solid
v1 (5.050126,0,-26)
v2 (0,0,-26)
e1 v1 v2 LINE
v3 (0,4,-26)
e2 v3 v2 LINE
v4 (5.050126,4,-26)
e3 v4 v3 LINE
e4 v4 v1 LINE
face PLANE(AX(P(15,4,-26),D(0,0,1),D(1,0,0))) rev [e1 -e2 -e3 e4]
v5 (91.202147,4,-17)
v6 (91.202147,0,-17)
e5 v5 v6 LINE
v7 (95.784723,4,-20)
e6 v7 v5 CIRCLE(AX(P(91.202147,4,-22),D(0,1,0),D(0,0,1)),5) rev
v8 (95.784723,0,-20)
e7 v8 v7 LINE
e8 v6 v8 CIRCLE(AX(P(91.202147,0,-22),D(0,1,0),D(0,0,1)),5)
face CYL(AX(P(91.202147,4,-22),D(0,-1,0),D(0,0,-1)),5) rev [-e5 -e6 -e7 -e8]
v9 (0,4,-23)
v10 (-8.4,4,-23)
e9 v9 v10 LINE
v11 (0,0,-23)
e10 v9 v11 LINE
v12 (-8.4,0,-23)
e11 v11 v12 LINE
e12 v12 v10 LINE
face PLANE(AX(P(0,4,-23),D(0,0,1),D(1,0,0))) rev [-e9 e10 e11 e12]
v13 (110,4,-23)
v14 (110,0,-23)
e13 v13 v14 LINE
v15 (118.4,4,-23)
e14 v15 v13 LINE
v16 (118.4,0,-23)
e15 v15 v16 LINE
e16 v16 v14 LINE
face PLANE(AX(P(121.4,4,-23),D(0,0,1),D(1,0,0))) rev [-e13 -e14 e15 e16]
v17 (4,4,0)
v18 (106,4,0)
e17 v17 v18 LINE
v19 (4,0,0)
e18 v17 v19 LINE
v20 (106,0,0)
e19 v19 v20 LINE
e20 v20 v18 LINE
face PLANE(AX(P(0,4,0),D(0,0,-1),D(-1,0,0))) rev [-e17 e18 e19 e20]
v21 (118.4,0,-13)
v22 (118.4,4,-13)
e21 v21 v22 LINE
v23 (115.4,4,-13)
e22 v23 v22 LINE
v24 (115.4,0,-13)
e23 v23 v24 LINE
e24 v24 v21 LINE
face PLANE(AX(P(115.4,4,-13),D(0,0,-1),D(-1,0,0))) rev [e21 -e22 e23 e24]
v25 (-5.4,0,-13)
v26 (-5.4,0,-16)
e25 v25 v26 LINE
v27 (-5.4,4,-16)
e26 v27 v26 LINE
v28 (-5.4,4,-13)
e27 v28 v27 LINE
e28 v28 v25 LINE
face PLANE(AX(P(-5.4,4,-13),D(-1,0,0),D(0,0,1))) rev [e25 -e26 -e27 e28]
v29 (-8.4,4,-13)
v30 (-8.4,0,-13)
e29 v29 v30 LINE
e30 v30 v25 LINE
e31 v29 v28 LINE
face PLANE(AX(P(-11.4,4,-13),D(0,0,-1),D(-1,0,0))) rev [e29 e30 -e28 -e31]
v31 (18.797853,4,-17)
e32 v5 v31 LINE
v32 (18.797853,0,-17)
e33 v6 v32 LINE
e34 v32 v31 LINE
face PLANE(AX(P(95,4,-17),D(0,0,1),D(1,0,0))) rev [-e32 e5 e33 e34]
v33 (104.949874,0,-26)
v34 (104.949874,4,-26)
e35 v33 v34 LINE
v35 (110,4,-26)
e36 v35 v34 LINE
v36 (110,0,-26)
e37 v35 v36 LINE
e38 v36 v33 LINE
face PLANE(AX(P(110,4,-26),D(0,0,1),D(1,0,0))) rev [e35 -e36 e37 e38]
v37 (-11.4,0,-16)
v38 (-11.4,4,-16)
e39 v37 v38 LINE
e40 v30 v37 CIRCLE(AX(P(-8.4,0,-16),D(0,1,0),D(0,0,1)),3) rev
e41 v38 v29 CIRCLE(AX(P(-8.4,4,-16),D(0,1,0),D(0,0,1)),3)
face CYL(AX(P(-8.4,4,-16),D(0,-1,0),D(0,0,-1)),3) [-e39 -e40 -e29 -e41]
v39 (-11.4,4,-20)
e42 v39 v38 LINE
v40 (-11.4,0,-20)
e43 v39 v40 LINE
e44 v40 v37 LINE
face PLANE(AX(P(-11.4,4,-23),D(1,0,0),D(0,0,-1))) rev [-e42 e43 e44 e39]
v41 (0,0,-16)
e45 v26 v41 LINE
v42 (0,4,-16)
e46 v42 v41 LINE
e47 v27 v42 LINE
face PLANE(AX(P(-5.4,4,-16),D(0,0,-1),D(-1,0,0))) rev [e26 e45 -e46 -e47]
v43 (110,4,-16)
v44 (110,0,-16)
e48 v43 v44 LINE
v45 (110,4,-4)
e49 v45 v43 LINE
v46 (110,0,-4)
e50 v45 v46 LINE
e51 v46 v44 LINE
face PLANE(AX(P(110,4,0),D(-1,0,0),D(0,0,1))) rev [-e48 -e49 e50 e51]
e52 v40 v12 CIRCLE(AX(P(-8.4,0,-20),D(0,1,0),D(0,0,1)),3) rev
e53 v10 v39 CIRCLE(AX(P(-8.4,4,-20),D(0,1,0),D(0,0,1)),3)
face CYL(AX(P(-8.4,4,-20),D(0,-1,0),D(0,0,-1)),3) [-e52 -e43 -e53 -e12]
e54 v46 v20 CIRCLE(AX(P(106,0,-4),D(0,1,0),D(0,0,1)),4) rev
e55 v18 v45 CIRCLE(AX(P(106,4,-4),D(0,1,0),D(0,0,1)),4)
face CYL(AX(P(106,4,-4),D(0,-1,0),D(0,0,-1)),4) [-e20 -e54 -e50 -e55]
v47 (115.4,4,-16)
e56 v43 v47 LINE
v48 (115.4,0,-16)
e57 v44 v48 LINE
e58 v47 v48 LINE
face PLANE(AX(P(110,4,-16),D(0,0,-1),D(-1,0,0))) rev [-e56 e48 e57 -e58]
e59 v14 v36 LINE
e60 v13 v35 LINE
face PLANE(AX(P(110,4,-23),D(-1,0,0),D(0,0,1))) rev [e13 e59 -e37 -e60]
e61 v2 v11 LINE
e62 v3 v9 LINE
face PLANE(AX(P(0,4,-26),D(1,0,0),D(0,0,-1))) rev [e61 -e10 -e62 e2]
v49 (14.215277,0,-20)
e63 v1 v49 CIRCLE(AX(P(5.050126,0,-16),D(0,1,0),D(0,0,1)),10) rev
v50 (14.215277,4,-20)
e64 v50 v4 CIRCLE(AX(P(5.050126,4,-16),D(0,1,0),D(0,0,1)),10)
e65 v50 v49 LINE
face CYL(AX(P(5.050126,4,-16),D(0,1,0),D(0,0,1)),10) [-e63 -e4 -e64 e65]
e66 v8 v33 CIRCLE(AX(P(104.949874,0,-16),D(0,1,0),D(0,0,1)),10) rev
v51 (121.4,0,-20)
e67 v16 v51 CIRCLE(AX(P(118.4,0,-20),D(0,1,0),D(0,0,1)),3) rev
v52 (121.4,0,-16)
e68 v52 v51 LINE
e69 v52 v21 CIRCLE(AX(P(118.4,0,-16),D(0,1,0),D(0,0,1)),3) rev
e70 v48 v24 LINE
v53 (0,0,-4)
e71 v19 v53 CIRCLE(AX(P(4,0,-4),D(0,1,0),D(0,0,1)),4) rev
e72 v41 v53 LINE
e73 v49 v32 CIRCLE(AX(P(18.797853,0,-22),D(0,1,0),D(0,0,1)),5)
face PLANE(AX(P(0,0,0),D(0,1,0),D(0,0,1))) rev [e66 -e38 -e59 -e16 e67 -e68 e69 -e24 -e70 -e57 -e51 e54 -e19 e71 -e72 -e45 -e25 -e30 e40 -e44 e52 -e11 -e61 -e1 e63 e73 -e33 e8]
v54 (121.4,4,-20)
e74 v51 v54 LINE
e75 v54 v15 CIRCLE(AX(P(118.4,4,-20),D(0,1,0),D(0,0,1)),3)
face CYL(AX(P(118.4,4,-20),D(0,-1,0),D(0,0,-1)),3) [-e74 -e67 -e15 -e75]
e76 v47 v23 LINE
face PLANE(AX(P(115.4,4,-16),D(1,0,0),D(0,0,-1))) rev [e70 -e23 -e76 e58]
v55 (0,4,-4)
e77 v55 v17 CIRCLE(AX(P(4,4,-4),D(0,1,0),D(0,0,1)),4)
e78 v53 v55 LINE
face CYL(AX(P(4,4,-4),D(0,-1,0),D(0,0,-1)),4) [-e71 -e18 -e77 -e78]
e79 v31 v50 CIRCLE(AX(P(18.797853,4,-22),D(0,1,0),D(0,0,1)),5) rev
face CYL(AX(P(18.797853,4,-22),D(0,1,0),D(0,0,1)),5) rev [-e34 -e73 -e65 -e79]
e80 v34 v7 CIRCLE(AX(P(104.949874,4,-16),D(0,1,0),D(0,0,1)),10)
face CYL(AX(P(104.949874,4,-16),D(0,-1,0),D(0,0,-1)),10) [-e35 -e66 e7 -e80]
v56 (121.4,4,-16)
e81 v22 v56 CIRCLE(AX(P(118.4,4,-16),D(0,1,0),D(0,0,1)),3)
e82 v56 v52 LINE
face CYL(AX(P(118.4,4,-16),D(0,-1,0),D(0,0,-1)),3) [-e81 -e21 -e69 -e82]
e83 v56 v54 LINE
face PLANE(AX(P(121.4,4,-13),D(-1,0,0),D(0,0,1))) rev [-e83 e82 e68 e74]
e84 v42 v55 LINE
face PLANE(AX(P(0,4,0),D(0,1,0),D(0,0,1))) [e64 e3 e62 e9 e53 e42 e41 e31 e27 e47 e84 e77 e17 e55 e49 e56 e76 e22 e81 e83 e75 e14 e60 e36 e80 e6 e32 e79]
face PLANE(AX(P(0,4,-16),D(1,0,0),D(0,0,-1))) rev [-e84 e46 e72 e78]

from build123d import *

# Parameters (mm, degrees)
ESTRUSIONE_ESTRUSIONE1_DEPTH = 4
RACCORDO1_R                  = 10
RACCORDO2_R                  = 4
RACCORDO9_R                  = 3
RACCORDO10_R                 = 3
RACCORDO11_R                 = 5


with BuildPart() as part:
    # Schizzo1 → Estrusione-Estrusione1 (new body)
    with BuildSketch(Plane(origin=(0, 0, 0), x_dir=(1, 0, 0), z_dir=(0, 1, 0))):
        Polygon((-11.4, 23), (-11.4, 13), (-5.4, 13), (-5.4, 16), (0, 16), (0, 0), (110, 0), (110, 16), (115.4, 16), (115.4, 13), (121.4, 13), (121.4, 23), (110, 23), (110, 26), (95, 26), (95, 17), (15, 17), (15, 26), (0, 26), (0, 23), align=None)
    extrude(amount=ESTRUSIONE_ESTRUSIONE1_DEPTH)

    # Raccordo1
    # the kernel refuses this fillet: 10 mm, written as the material it takes off along each edge
    with BuildSketch(Plane(origin=(95, -24.874685928, -26), x_dir=(1, 0, 0), z_dir=(0, 1, 0))) as raccordo1_piece_1:
        with BuildLine():
            CenterArc((9.949874371, -10), RACCORDO1_R, 90, 84.260829523)
            Line((0, -9), (-0.198997487, -8.98))
            ThreePointArc((-0.198997487, -8.98), (-0.2, -4.5), (-0.2, 0))
            Line((-0.2, 0), (0, 0.2))
            Line((0, 0.2), (9.949874371, 0.2))
            Line((9.949874371, 0.2), (9.949874371, 0))
        make_face()
    extrude(amount=53.749371855, mode=Mode.SUBTRACT)
    with BuildSketch(Plane(origin=(15, -24.874685928, -26), x_dir=(0, 0, 1), z_dir=(0, 1, 0))) as raccordo1_piece_2:
        with BuildLine():
            CenterArc((10, -9.949874371), RACCORDO1_R, 95.739170477, 84.260829523)
            Line((0, -9.949874371), (-0.2, -9.949874371))
            Line((-0.2, -9.949874371), (-0.2, 0))
            Line((-0.2, 0), (0, 0.2))
            ThreePointArc((0, 0.2), (4.5, 0.2), (8.98, 0.198997487))
            Line((8.98, 0.198997487), (9, 0))
        make_face()
    extrude(amount=53.749371855, mode=Mode.SUBTRACT)

    # Raccordo2
    raccordo2_edges = [part.edges().sort_by_distance(p)[0] for p in [
        (110, 2, 0),
        (0, 2, 0),
    ]]
    fillet(raccordo2_edges, radius=RACCORDO2_R)

    # Raccordo9
    raccordo9_edges = [part.edges().sort_by_distance(p)[0] for p in [
        (-11.4, 2, -13),
        (-11.4, 2, -23),
    ]]
    fillet(raccordo9_edges, radius=RACCORDO9_R)

    # Raccordo10
    raccordo10_edges = [part.edges().sort_by_distance(p)[0] for p in [
        (121.4, 2, -23),
        (121.4, 2, -13),
    ]]
    fillet(raccordo10_edges, radius=RACCORDO10_R)

    # Raccordo11
    raccordo11_edges = [part.edges().sort_by_distance(p)[0] for p in [
        (15, 2, -17),
        (95, 2, -17),
    ]]
    fillet(raccordo11_edges, radius=RACCORDO11_R)


solid = part.part
